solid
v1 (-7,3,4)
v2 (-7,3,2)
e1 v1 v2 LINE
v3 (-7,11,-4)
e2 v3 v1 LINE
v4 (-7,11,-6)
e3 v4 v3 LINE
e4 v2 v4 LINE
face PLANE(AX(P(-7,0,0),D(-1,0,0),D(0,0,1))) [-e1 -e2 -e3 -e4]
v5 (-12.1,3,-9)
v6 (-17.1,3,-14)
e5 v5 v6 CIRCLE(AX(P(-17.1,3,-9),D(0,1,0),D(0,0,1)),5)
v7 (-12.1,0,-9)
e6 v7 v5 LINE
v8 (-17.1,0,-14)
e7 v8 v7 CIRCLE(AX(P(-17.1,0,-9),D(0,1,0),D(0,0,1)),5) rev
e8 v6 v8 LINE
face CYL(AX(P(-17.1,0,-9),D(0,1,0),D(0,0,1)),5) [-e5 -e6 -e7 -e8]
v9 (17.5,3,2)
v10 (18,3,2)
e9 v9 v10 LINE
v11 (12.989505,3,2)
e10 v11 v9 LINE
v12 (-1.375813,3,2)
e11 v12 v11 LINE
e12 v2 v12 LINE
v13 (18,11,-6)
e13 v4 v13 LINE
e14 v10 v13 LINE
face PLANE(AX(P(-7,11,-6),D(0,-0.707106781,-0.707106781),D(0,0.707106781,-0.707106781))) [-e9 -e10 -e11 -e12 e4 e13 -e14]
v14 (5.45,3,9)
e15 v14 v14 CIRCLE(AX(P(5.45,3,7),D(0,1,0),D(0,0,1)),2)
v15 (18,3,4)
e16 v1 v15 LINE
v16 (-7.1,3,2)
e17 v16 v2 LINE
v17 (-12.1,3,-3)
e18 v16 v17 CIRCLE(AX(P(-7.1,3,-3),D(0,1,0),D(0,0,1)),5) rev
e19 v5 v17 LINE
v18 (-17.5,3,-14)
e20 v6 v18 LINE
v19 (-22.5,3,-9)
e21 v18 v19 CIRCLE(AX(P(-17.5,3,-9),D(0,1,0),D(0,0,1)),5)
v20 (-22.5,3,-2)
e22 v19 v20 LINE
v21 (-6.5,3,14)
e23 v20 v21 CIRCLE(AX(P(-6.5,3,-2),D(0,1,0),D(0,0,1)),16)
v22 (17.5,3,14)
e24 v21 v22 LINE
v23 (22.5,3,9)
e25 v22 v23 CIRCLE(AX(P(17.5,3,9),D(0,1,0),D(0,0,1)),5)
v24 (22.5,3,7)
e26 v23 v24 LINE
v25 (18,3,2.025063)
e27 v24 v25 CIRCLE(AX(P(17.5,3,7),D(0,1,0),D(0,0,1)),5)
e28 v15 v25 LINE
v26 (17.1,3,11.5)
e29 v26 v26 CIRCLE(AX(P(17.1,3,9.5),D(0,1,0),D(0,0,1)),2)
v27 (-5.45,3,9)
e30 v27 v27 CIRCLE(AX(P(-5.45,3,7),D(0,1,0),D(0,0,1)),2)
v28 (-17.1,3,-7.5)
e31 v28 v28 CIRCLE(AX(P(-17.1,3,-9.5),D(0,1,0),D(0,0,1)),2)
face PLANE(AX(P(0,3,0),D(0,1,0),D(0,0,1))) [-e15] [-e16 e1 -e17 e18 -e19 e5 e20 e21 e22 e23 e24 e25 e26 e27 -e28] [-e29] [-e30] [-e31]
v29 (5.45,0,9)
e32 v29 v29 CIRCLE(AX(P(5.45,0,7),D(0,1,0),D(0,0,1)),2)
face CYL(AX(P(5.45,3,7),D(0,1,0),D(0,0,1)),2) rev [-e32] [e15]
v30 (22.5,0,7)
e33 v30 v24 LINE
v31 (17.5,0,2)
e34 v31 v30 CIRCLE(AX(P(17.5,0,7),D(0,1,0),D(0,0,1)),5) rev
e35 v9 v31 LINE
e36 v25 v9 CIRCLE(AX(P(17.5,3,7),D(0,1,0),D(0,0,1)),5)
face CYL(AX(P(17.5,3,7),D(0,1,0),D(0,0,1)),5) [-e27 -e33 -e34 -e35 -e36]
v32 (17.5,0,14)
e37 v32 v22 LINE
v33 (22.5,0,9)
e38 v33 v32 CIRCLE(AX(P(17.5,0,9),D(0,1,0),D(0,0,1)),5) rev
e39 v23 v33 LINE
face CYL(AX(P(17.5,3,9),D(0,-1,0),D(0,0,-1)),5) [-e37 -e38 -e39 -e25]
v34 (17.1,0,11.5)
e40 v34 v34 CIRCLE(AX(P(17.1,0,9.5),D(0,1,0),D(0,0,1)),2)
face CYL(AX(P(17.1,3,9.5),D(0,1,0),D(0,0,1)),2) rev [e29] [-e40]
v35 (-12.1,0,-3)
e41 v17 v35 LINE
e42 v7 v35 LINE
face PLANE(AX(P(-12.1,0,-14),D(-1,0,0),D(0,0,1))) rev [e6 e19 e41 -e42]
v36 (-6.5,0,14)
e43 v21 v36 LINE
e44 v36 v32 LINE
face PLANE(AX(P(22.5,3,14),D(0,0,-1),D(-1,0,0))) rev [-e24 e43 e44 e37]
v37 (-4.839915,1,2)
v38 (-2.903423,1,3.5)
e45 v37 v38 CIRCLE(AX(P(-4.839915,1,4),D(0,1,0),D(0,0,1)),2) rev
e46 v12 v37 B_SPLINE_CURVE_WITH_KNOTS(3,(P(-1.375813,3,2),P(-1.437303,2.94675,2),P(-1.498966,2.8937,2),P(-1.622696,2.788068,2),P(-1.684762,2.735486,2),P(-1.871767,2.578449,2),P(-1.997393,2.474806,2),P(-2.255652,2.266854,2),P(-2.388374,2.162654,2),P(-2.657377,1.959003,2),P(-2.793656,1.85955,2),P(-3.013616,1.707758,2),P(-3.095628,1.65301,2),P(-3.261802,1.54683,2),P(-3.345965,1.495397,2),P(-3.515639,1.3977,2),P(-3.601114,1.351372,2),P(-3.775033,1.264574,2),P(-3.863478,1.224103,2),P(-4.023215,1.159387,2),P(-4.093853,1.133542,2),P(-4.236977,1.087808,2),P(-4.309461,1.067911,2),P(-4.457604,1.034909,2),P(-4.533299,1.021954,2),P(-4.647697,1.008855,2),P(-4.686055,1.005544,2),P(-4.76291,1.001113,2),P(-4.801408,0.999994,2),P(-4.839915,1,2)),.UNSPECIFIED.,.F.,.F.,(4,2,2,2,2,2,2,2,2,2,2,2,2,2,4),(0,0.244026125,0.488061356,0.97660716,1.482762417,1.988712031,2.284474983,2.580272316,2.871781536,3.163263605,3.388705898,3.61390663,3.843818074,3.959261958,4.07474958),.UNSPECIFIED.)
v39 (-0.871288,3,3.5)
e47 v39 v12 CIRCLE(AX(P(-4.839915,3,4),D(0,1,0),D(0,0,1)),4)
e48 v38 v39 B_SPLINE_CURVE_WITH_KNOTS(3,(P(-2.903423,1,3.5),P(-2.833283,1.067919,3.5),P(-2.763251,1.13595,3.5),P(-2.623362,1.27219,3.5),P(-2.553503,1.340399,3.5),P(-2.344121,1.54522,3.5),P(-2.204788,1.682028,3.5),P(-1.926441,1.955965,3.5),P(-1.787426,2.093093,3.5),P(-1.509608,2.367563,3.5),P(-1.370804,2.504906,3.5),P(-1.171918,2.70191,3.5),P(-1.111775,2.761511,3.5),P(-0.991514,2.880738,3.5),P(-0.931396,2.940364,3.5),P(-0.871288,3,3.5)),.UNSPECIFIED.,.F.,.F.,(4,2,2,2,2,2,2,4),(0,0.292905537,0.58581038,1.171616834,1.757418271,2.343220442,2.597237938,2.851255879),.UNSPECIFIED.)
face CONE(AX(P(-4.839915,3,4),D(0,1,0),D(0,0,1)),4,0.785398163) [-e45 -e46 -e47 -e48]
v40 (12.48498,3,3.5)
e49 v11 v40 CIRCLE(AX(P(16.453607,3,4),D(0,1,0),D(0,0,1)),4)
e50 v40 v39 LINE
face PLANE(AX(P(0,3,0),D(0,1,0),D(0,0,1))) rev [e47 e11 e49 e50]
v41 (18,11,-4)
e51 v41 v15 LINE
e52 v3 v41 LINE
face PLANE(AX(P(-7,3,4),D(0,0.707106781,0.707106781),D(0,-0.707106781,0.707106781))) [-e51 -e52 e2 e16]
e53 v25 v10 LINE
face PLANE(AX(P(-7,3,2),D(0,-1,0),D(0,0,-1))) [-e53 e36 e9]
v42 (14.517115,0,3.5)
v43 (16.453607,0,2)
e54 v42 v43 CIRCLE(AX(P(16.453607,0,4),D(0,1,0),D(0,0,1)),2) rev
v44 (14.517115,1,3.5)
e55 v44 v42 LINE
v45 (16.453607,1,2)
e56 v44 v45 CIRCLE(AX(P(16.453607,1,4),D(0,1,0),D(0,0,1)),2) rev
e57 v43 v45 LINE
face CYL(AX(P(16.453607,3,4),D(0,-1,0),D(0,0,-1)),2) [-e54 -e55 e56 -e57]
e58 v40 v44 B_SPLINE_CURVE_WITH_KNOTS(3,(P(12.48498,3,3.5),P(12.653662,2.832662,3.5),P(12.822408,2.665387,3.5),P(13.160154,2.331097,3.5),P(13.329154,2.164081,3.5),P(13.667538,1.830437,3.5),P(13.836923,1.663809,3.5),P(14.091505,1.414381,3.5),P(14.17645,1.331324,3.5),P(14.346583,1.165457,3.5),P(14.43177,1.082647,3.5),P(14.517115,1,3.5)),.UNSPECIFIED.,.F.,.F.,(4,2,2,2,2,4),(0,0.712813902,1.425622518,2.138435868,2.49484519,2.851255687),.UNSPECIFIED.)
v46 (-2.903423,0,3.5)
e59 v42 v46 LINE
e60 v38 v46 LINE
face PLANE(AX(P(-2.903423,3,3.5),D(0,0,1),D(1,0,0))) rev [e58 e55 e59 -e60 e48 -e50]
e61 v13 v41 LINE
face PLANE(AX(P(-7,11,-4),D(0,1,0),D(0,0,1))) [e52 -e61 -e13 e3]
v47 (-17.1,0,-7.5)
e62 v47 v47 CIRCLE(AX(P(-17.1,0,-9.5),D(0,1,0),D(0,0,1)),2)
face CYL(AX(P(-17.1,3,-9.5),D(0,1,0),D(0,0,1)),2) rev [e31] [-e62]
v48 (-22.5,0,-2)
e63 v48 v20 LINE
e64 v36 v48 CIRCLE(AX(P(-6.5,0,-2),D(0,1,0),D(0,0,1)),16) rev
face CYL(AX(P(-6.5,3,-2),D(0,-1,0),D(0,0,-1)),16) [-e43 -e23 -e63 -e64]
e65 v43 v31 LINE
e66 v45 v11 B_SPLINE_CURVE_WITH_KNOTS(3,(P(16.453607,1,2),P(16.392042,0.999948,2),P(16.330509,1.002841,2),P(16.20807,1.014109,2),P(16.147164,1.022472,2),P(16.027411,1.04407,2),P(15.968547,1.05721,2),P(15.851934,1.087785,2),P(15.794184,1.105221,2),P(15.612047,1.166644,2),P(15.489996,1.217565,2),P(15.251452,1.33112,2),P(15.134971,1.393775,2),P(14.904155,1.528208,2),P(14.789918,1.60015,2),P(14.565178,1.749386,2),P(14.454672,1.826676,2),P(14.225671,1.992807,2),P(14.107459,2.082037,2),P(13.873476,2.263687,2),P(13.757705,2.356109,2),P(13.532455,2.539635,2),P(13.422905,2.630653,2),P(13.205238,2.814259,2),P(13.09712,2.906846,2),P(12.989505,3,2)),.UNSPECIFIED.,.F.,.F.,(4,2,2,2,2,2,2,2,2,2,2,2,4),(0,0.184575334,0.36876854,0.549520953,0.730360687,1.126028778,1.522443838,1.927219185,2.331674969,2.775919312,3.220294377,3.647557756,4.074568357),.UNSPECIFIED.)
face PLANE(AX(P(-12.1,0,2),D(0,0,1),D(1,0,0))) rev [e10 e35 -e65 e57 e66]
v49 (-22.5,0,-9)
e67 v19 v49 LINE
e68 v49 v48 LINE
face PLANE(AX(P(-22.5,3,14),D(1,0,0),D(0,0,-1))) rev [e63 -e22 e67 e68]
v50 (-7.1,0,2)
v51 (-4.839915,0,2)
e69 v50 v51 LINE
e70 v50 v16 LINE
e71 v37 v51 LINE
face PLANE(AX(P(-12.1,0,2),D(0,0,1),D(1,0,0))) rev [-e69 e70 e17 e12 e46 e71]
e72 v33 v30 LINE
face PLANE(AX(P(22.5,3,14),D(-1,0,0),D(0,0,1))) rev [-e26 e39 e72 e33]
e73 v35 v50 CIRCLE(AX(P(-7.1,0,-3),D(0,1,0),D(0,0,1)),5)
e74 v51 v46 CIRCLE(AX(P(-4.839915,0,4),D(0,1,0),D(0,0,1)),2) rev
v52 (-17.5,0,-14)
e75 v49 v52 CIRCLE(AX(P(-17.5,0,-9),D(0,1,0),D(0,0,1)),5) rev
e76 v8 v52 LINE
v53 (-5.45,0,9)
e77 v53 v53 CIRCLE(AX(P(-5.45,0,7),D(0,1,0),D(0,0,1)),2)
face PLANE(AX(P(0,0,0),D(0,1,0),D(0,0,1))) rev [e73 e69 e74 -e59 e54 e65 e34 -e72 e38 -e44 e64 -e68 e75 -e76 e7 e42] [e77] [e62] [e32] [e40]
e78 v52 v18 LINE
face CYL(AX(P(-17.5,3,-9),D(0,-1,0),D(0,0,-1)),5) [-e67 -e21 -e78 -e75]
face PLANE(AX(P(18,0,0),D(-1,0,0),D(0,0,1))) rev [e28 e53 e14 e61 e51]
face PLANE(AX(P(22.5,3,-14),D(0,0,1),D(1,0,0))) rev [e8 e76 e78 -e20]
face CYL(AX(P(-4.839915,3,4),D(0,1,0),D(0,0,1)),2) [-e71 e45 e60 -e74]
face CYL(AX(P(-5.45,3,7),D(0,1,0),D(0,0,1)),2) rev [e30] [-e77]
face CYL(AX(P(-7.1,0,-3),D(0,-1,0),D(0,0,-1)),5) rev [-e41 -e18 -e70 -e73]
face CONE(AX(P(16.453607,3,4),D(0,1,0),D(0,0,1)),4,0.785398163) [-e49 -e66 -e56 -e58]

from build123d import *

# Parameters (mm, degrees)
SKETCH1_W                = 45
SKETCH1_H                = 28
BOSS_EXTRUDE1_DEPTH      = 3
F_4_0_4_DIAMETER_HOLE1_D = 4
F_4_0_4_DIAMETER_HOLE2_D = 4
SKETCH10_W               = 34.6
SKETCH10_H               = 16
CUT_EXTRUDE2_DEPTH       = 3
FILLET2_R                = 5
FILLET3_R                = 16
BOSS_EXTRUDE2_START      = -5
BOSS_EXTRUDE2_DEPTH      = 25
SKETCH12_W               = 17.420537897
SKETCH12_H               = 1.5
CUT_EXTRUDE3_DEPTH       = 3
FILLET4_R                = 2
CHAMFER1_SIZE            = 2


with BuildPart() as part:
    # Sketch1 → Boss-Extrude1 (new body)
    with BuildSketch(Plane(origin=(0, 0, 0), x_dir=(1, 0, 0), z_dir=(0, 1, 0))):
        Rectangle(SKETCH1_W, SKETCH1_H)
    extrude(amount=BOSS_EXTRUDE1_DEPTH)

    # Ø4.0 (4) Diameter Hole1 (through all)
    with Locations(Plane(origin=(0, 3, 0), x_dir=(1, 0, 0), z_dir=(0, 1, 0))):
        with Locations((-17.1, 9.5), (17.1, -9.5)):
            Hole(F_4_0_4_DIAMETER_HOLE1_D / 2)

    # Ø4.0 (4) Diameter Hole2 (through all)
    with Locations(Plane(origin=(0, 3, 0), x_dir=(1, 0, 0), z_dir=(0, 1, 0))):
        with Locations((-5.45, -7), (5.45, -7)):
            Hole(F_4_0_4_DIAMETER_HOLE2_D / 2)

    # Sketch10 → Cut-Extrude2 (cut)
    with BuildSketch(Plane(origin=(0, 3, 0), x_dir=(1, 0, 0), z_dir=(0, 1, 0))):
        with Locations((5.2, 6)):
            Rectangle(SKETCH10_W, SKETCH10_H)
    extrude(amount=-CUT_EXTRUDE2_DEPTH, mode=Mode.SUBTRACT)

    # Fillet2
    fillet2_edges = [part.edges().sort_by_distance(p)[0] for p in [
        (-12.1, 1.5, -14),
        (22.5, 1.5, 2),
        (-12.1, 1.5, 2),
        (-22.5, 1.5, -14),
        (22.5, 1.5, 14),
    ]]
    fillet(fillet2_edges, radius=FILLET2_R)

    # Fillet3
    fillet3_edges = [part.edges().sort_by_distance(p)[0] for p in [
        (-22.5, 1.5, 14),
    ]]
    fillet(fillet3_edges, radius=FILLET3_R)

    # Sketch11 → Boss-Extrude2 (add)
    with BuildSketch(Plane(origin=(23, 0, 0), x_dir=(0, 0, -1), z_dir=(1, 0, 0)).offset(BOSS_EXTRUDE2_START)):
        Polygon((-4, 3), (4, 11), (6, 11), (-2, 3), align=None)
    extrude(amount=-BOSS_EXTRUDE2_DEPTH)

    # Sketch12 → Cut-Extrude3 (cut)
    with BuildSketch(Plane.XZ):
        with Locations((5.806845965, 2.75)):
            Rectangle(SKETCH12_W, SKETCH12_H)
    extrude(amount=-CUT_EXTRUDE3_DEPTH, mode=Mode.SUBTRACT)

    # Fillet4
    # the kernel refuses this fillet: 2 mm, written as the material it takes off along each edge
    with BuildSketch(Plane(origin=(-2.903422983, -4.841229183, 2), x_dir=(0, 0, 1), z_dir=(0, 1, 0))) as fillet4_piece_1:
        with BuildLine():
            CenterArc((2, -1.936491673), FILLET4_R, 104.477512186, 75.522487814)
            Line((0, -1.936491673), (0, 0))
            Line((0, 0), (1.5, 0))
        make_face()
    extrude(amount=7.841229183, mode=Mode.SUBTRACT)
    with BuildSketch(Plane(origin=(14.517114914, -4.841229183, 2), x_dir=(1, 0, 0), z_dir=(0, 1, 0))) as fillet4_piece_2:
        with BuildLine():
            CenterArc((1.936491673, -2), FILLET4_R, 90, 75.522487814)
            Line((0, -1.5), (0, 0))
            Line((0, 0), (1.936491673, 0))
        make_face()
    extrude(amount=7.841229183, mode=Mode.SUBTRACT)

    # Chamfer1
    # the kernel refuses this chamfer: 2 mm, written as the material it adds along each edge
    with BuildSketch(Plane(origin=(-4.839914656, 3, 4), x_dir=(-0.680858233566239, 0, 0.732415227712437), z_dir=(-0.732415227712437, 0, -0.680858233566239))) as chamfer1_piece_1_section:
        Polygon((2, -CHAMFER1_SIZE), (2 + CHAMFER1_SIZE, 0), (2, 0), align=None)
    chamfer1_piece_1 = revolve(axis=Axis((-4.839914656, 3, 4), (0, 1, 0)), revolution_arc=222.910744897, mode=Mode.PRIVATE)
    chamfer1_piece_1 = split(chamfer1_piece_1, bisect_by=Plane(origin=(-2.32351346, 2.593002324, 2), z_dir=(0, 0, 1)), keep=Keep.TOP, mode=Mode.PRIVATE)
    chamfer1_piece_1 = split(chamfer1_piece_1, bisect_by=Plane(origin=(-2.32351346, 2.593002324, 3.5), z_dir=(0, 0, -1)), keep=Keep.TOP, mode=Mode.PRIVATE)
    add(chamfer1_piece_1)
    with BuildSketch(Plane(origin=(16.453606588, 3, 4), x_dir=(0, 0, -1), z_dir=(1, 0, 0))) as chamfer1_piece_2_section:
        Polygon((2, -CHAMFER1_SIZE), (2 + CHAMFER1_SIZE, 0), (2, 0), align=None)
    chamfer1_piece_2 = revolve(axis=Axis((16.453606588, 3, 4), (0, 1, 0)), revolution_arc=222.910744897, mode=Mode.PRIVATE)
    chamfer1_piece_2 = split(chamfer1_piece_2, bisect_by=Plane(origin=(14.636969069, 2.019912547, 2), z_dir=(0, 0, 1)), keep=Keep.TOP, mode=Mode.PRIVATE)
    chamfer1_piece_2 = split(chamfer1_piece_2, bisect_by=Plane(origin=(14.636969069, 3.296842404, 3.703157596), z_dir=(0, -0.7071067811865511, -0.7071067811865439)), keep=Keep.TOP, mode=Mode.PRIVATE)
    add(chamfer1_piece_2)


solid = part.part
